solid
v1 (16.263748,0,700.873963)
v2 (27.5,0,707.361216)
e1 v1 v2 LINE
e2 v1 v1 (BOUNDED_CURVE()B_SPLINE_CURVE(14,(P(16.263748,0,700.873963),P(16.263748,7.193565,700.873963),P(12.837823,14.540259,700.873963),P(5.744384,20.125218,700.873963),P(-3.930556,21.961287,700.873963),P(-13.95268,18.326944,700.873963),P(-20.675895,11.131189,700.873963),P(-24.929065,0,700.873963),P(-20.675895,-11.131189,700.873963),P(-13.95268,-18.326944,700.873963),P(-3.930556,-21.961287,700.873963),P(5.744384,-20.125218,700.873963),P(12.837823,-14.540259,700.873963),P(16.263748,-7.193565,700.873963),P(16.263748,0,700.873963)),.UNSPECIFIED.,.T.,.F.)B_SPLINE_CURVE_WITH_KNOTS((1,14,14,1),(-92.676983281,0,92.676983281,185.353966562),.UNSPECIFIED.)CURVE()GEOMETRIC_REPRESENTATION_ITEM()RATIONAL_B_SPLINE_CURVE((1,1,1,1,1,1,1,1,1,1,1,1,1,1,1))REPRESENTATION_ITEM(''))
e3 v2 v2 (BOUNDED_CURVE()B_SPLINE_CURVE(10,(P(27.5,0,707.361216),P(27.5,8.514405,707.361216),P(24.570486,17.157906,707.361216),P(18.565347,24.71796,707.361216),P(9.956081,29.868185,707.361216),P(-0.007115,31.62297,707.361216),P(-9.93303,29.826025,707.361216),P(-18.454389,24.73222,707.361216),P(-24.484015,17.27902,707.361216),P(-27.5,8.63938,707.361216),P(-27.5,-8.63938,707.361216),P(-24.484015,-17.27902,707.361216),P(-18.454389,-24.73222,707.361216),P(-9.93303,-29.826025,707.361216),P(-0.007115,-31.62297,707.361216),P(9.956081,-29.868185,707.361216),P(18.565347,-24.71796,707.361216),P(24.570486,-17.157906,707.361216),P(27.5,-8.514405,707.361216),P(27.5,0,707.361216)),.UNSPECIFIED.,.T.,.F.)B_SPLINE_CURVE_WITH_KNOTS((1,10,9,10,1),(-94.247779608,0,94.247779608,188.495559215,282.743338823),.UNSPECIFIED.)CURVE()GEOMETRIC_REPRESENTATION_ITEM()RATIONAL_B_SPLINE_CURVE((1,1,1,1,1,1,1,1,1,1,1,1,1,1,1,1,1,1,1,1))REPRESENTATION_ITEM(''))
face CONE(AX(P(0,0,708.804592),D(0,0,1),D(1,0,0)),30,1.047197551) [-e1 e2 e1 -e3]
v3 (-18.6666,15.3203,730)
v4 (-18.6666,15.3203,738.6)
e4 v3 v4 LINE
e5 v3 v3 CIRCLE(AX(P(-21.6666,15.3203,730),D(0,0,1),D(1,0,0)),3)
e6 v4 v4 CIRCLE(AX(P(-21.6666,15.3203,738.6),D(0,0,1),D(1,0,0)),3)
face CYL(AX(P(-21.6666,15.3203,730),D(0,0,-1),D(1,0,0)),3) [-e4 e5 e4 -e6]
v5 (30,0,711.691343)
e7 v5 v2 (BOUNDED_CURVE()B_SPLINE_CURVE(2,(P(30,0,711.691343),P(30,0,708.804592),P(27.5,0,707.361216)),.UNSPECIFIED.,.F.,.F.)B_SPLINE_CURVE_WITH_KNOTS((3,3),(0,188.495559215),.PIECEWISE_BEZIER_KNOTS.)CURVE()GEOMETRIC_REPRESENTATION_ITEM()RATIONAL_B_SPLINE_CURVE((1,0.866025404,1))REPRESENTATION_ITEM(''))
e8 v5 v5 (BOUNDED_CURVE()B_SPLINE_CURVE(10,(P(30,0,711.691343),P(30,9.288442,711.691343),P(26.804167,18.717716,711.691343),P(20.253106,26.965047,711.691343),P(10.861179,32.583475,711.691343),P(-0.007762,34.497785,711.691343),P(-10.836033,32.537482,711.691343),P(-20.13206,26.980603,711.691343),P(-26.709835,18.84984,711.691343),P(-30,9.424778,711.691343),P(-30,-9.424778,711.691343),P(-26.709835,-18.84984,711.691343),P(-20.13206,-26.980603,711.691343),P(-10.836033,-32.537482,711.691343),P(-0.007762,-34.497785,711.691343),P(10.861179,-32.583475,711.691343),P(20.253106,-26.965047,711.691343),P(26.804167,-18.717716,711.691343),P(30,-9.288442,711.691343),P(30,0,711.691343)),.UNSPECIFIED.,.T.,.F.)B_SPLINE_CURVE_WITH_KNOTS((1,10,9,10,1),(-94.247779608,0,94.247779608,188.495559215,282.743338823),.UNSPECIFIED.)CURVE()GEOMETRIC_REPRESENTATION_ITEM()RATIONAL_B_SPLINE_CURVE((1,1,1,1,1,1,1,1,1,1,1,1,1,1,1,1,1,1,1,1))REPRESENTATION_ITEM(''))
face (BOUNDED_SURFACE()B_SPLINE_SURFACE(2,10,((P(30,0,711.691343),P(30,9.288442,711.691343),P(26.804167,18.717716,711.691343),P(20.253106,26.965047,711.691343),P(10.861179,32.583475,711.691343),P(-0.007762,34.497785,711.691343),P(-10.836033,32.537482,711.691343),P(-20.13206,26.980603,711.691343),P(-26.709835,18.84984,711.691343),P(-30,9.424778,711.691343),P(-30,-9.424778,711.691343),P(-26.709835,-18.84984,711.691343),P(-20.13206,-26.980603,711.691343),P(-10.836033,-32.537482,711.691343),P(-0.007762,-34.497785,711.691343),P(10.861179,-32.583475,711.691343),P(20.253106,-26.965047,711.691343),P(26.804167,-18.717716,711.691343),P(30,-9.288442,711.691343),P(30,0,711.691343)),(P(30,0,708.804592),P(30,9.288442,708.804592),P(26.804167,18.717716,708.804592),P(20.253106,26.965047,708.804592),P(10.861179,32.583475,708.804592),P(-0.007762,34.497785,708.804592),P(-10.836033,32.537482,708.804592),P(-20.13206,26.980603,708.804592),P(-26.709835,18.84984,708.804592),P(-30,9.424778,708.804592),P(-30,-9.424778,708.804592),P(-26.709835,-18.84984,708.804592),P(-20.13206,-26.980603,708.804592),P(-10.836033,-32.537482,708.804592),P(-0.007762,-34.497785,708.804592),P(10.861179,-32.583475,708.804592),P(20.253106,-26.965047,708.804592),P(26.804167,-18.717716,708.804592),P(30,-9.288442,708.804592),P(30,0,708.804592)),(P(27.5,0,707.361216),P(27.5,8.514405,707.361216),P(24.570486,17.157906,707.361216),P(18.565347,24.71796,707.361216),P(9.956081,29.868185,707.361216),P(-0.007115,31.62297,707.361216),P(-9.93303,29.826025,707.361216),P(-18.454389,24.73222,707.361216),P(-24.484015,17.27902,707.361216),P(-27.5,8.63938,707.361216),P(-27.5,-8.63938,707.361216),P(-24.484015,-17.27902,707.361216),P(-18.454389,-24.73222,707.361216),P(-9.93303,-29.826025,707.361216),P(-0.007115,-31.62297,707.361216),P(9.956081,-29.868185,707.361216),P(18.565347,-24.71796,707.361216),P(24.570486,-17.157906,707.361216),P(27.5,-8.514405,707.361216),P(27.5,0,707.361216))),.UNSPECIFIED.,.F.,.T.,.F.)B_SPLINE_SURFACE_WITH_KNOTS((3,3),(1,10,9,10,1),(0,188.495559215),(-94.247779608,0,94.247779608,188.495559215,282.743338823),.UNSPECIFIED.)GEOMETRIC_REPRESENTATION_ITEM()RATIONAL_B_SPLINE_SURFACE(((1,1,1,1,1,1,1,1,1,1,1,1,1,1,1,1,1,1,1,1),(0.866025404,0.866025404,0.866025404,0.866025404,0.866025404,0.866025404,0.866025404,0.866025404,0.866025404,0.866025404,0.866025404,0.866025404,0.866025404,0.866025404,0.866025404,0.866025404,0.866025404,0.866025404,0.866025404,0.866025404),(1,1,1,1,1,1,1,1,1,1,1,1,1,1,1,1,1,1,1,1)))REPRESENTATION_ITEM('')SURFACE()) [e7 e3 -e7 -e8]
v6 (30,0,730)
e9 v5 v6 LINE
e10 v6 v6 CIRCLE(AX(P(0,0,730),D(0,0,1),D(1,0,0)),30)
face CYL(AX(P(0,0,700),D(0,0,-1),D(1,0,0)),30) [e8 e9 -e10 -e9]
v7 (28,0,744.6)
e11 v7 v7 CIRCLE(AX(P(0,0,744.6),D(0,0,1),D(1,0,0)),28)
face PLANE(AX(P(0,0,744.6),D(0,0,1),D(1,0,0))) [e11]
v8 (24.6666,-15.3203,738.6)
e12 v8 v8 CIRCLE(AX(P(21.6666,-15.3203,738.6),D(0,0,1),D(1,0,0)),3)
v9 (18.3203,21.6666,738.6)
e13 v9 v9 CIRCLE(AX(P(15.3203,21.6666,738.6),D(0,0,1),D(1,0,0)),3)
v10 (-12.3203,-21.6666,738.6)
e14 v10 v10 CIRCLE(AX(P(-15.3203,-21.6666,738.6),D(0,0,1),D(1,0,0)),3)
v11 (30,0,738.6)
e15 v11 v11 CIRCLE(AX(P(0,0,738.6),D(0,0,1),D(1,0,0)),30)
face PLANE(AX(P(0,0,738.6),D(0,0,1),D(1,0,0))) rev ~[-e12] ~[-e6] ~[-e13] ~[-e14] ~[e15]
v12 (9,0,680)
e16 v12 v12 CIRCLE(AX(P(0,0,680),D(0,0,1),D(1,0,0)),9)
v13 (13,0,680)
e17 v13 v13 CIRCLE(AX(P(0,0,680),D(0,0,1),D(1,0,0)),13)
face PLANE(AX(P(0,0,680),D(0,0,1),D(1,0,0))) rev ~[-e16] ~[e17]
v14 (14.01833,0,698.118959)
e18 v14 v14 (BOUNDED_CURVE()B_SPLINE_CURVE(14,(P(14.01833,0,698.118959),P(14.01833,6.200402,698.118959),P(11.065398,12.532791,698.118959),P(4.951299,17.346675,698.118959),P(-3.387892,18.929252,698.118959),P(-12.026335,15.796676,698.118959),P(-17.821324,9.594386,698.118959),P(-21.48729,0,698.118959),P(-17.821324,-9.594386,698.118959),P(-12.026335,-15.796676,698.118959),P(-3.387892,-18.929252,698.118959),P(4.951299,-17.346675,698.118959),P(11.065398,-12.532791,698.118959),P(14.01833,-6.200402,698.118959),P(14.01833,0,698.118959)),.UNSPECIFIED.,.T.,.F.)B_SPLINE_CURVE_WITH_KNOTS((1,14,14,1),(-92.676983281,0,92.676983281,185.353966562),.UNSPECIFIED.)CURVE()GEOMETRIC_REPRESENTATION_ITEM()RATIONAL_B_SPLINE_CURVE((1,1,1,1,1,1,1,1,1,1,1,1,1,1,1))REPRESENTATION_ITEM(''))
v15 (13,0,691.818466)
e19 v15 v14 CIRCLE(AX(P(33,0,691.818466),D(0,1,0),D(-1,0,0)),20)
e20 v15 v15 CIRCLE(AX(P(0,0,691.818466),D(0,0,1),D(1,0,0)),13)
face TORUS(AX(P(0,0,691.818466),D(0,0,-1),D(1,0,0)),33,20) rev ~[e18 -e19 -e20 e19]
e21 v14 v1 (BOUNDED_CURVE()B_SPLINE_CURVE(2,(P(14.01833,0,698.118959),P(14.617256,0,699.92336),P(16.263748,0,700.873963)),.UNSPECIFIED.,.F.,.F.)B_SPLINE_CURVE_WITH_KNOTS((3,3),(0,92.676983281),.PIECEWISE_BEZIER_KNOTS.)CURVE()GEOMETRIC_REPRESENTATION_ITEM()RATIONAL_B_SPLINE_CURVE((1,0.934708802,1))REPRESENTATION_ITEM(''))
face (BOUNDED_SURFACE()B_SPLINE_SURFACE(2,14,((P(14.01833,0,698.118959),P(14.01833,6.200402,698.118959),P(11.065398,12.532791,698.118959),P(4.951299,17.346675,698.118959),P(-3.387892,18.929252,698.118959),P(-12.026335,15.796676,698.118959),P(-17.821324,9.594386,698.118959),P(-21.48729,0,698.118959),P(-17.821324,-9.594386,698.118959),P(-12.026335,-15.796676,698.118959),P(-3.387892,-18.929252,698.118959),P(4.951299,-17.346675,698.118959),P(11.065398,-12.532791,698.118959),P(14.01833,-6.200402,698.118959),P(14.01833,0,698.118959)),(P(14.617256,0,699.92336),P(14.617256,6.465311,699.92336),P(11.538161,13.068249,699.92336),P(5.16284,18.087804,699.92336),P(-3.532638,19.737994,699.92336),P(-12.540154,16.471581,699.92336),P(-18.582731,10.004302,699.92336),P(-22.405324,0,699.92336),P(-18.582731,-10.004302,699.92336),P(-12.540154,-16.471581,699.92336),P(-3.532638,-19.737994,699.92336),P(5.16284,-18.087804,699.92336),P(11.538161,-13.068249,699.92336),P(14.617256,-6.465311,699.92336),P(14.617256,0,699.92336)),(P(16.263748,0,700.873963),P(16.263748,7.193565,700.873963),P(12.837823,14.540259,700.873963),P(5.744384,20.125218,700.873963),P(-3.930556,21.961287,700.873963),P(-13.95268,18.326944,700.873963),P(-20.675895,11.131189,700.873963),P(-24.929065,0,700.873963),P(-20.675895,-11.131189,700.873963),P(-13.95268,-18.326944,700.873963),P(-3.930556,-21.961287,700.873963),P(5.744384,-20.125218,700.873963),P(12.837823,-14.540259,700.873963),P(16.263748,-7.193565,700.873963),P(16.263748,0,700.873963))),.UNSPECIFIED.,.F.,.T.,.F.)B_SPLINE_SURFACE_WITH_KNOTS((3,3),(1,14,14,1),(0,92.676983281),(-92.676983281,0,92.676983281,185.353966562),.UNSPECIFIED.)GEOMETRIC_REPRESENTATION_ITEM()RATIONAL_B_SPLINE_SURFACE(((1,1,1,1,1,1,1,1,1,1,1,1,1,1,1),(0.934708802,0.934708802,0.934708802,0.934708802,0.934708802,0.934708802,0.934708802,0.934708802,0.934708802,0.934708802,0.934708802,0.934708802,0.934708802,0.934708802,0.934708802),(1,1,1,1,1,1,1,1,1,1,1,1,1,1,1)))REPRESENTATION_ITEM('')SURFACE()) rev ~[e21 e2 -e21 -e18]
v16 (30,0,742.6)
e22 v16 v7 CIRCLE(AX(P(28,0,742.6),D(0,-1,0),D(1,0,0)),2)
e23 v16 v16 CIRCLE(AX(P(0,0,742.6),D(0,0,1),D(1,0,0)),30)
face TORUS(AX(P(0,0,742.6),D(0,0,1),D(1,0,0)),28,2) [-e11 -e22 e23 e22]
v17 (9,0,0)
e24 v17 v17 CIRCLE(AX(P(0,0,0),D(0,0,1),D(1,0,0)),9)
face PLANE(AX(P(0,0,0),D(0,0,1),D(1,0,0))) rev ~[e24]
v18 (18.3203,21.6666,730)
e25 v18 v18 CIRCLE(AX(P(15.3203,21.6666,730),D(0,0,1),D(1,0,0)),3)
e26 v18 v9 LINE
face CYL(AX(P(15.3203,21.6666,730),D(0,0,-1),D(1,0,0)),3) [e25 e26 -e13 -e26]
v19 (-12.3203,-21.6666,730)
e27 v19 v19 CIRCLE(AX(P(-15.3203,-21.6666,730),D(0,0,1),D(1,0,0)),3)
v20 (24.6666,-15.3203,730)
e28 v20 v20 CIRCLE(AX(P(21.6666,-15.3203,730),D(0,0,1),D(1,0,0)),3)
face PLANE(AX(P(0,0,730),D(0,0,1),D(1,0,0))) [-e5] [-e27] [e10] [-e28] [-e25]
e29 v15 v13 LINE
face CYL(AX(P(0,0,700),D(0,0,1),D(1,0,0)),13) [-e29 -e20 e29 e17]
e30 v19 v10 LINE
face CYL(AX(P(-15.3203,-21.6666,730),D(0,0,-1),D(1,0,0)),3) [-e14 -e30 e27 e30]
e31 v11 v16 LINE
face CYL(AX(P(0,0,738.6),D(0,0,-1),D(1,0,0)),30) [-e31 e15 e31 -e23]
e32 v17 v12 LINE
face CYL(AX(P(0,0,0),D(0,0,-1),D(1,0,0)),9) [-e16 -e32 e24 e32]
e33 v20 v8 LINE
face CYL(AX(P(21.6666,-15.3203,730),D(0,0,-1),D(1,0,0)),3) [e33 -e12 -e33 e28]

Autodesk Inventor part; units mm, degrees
ref_plane "YZ Plane" through (0, 0, 0) normal (1, 0, 0) x (0, 1, 0)
ref_plane "XZ Plane" through (0, 0, 0) normal (0, 1, 0) x (-1, 0, 0)
ref_plane "XY Plane" through (0, 0, 0) normal (0, 0, 1) x (1, 0, 0)
sketch "Sketch1" plane through (0, 0, 0) normal (0, 0, 1) x (1, 0, 0)
  circle A0 centre (0, 0) radius 9
  dimension "d0" = 18
extrude "Extrusion1" add sketch "Sketch1" along normal blind 700
sketch "Sketch2" plane through (0, 0, 700) normal (0, 0, 1) x (1, 0, 0)
  circle A0 centre (0, 0) radius 9 projected
  circle A1 centre (0, 0) radius 30
  circle A2 centre (0, 0) radius 13
  dimension "d3" = 60
  dimension "d33" = 26
extrude "Extrusion2" add sketch "Sketch2" along normal blind 30 contours A0 | A1 | A2
sketch "Sketch3" plane through (0, 0, 730) normal (0, 0, 1) x (1, 0, 0)
  circle A0 centre (0, 0) radius 30 projected
  line L0 (-24.495, 17.3203) -> (0, 0) construction
  line L1 (24.495, -17.3203) -> (0, 0) construction
  line L2 (0, 0) -> (17.3203, 24.495) construction
  line L3 (0, 0) -> (-17.3203, -24.495) construction
  circle A1 centre (-21.6666, 15.3203) radius 3
  circle A2 centre (-15.3203, -21.6666) radius 3
  circle A3 centre (21.6666, -15.3203) radius 3
  circle A4 centre (15.3203, 21.6666) radius 3
  dimension "d18" = 6
  dimension "d19" = 2
  dimension "d22" = 360
extrude "Extrusion3" add sketch "Sketch3" along normal blind 8.6 contours A1 | A2 | A3 | A4
sketch "Sketch4" plane through (0, 0, 738.6) normal (0, 0, 1) x (1, 0, 0)
  circle A0 centre (0, 0) radius 30
  dimension "d9" = 60
extrude "Extrusion4" add sketch "Sketch4" along normal blind 6
chamfer "Chamfer2" distance 15.25 angle 30 1 edges at (-30, 0, 700) measured on face at (22.6222, -3.1111, 700)
fillet "Fillet5" radius 5 1 edges at (-30, 0, 708.8046)
extrude "Extrusion5" add sketch "Sketch2" against normal blind 20 contours A2
fillet "Fillet7" radius 20 1 edges at (-13, 0, 700)
fillet "Fillet8" radius 5 1 edges at (-14.75, 0, 700)
fillet "Fillet9" radius 2 1 edges at (-30, 0, 744.6)
properties part number "anemo"
